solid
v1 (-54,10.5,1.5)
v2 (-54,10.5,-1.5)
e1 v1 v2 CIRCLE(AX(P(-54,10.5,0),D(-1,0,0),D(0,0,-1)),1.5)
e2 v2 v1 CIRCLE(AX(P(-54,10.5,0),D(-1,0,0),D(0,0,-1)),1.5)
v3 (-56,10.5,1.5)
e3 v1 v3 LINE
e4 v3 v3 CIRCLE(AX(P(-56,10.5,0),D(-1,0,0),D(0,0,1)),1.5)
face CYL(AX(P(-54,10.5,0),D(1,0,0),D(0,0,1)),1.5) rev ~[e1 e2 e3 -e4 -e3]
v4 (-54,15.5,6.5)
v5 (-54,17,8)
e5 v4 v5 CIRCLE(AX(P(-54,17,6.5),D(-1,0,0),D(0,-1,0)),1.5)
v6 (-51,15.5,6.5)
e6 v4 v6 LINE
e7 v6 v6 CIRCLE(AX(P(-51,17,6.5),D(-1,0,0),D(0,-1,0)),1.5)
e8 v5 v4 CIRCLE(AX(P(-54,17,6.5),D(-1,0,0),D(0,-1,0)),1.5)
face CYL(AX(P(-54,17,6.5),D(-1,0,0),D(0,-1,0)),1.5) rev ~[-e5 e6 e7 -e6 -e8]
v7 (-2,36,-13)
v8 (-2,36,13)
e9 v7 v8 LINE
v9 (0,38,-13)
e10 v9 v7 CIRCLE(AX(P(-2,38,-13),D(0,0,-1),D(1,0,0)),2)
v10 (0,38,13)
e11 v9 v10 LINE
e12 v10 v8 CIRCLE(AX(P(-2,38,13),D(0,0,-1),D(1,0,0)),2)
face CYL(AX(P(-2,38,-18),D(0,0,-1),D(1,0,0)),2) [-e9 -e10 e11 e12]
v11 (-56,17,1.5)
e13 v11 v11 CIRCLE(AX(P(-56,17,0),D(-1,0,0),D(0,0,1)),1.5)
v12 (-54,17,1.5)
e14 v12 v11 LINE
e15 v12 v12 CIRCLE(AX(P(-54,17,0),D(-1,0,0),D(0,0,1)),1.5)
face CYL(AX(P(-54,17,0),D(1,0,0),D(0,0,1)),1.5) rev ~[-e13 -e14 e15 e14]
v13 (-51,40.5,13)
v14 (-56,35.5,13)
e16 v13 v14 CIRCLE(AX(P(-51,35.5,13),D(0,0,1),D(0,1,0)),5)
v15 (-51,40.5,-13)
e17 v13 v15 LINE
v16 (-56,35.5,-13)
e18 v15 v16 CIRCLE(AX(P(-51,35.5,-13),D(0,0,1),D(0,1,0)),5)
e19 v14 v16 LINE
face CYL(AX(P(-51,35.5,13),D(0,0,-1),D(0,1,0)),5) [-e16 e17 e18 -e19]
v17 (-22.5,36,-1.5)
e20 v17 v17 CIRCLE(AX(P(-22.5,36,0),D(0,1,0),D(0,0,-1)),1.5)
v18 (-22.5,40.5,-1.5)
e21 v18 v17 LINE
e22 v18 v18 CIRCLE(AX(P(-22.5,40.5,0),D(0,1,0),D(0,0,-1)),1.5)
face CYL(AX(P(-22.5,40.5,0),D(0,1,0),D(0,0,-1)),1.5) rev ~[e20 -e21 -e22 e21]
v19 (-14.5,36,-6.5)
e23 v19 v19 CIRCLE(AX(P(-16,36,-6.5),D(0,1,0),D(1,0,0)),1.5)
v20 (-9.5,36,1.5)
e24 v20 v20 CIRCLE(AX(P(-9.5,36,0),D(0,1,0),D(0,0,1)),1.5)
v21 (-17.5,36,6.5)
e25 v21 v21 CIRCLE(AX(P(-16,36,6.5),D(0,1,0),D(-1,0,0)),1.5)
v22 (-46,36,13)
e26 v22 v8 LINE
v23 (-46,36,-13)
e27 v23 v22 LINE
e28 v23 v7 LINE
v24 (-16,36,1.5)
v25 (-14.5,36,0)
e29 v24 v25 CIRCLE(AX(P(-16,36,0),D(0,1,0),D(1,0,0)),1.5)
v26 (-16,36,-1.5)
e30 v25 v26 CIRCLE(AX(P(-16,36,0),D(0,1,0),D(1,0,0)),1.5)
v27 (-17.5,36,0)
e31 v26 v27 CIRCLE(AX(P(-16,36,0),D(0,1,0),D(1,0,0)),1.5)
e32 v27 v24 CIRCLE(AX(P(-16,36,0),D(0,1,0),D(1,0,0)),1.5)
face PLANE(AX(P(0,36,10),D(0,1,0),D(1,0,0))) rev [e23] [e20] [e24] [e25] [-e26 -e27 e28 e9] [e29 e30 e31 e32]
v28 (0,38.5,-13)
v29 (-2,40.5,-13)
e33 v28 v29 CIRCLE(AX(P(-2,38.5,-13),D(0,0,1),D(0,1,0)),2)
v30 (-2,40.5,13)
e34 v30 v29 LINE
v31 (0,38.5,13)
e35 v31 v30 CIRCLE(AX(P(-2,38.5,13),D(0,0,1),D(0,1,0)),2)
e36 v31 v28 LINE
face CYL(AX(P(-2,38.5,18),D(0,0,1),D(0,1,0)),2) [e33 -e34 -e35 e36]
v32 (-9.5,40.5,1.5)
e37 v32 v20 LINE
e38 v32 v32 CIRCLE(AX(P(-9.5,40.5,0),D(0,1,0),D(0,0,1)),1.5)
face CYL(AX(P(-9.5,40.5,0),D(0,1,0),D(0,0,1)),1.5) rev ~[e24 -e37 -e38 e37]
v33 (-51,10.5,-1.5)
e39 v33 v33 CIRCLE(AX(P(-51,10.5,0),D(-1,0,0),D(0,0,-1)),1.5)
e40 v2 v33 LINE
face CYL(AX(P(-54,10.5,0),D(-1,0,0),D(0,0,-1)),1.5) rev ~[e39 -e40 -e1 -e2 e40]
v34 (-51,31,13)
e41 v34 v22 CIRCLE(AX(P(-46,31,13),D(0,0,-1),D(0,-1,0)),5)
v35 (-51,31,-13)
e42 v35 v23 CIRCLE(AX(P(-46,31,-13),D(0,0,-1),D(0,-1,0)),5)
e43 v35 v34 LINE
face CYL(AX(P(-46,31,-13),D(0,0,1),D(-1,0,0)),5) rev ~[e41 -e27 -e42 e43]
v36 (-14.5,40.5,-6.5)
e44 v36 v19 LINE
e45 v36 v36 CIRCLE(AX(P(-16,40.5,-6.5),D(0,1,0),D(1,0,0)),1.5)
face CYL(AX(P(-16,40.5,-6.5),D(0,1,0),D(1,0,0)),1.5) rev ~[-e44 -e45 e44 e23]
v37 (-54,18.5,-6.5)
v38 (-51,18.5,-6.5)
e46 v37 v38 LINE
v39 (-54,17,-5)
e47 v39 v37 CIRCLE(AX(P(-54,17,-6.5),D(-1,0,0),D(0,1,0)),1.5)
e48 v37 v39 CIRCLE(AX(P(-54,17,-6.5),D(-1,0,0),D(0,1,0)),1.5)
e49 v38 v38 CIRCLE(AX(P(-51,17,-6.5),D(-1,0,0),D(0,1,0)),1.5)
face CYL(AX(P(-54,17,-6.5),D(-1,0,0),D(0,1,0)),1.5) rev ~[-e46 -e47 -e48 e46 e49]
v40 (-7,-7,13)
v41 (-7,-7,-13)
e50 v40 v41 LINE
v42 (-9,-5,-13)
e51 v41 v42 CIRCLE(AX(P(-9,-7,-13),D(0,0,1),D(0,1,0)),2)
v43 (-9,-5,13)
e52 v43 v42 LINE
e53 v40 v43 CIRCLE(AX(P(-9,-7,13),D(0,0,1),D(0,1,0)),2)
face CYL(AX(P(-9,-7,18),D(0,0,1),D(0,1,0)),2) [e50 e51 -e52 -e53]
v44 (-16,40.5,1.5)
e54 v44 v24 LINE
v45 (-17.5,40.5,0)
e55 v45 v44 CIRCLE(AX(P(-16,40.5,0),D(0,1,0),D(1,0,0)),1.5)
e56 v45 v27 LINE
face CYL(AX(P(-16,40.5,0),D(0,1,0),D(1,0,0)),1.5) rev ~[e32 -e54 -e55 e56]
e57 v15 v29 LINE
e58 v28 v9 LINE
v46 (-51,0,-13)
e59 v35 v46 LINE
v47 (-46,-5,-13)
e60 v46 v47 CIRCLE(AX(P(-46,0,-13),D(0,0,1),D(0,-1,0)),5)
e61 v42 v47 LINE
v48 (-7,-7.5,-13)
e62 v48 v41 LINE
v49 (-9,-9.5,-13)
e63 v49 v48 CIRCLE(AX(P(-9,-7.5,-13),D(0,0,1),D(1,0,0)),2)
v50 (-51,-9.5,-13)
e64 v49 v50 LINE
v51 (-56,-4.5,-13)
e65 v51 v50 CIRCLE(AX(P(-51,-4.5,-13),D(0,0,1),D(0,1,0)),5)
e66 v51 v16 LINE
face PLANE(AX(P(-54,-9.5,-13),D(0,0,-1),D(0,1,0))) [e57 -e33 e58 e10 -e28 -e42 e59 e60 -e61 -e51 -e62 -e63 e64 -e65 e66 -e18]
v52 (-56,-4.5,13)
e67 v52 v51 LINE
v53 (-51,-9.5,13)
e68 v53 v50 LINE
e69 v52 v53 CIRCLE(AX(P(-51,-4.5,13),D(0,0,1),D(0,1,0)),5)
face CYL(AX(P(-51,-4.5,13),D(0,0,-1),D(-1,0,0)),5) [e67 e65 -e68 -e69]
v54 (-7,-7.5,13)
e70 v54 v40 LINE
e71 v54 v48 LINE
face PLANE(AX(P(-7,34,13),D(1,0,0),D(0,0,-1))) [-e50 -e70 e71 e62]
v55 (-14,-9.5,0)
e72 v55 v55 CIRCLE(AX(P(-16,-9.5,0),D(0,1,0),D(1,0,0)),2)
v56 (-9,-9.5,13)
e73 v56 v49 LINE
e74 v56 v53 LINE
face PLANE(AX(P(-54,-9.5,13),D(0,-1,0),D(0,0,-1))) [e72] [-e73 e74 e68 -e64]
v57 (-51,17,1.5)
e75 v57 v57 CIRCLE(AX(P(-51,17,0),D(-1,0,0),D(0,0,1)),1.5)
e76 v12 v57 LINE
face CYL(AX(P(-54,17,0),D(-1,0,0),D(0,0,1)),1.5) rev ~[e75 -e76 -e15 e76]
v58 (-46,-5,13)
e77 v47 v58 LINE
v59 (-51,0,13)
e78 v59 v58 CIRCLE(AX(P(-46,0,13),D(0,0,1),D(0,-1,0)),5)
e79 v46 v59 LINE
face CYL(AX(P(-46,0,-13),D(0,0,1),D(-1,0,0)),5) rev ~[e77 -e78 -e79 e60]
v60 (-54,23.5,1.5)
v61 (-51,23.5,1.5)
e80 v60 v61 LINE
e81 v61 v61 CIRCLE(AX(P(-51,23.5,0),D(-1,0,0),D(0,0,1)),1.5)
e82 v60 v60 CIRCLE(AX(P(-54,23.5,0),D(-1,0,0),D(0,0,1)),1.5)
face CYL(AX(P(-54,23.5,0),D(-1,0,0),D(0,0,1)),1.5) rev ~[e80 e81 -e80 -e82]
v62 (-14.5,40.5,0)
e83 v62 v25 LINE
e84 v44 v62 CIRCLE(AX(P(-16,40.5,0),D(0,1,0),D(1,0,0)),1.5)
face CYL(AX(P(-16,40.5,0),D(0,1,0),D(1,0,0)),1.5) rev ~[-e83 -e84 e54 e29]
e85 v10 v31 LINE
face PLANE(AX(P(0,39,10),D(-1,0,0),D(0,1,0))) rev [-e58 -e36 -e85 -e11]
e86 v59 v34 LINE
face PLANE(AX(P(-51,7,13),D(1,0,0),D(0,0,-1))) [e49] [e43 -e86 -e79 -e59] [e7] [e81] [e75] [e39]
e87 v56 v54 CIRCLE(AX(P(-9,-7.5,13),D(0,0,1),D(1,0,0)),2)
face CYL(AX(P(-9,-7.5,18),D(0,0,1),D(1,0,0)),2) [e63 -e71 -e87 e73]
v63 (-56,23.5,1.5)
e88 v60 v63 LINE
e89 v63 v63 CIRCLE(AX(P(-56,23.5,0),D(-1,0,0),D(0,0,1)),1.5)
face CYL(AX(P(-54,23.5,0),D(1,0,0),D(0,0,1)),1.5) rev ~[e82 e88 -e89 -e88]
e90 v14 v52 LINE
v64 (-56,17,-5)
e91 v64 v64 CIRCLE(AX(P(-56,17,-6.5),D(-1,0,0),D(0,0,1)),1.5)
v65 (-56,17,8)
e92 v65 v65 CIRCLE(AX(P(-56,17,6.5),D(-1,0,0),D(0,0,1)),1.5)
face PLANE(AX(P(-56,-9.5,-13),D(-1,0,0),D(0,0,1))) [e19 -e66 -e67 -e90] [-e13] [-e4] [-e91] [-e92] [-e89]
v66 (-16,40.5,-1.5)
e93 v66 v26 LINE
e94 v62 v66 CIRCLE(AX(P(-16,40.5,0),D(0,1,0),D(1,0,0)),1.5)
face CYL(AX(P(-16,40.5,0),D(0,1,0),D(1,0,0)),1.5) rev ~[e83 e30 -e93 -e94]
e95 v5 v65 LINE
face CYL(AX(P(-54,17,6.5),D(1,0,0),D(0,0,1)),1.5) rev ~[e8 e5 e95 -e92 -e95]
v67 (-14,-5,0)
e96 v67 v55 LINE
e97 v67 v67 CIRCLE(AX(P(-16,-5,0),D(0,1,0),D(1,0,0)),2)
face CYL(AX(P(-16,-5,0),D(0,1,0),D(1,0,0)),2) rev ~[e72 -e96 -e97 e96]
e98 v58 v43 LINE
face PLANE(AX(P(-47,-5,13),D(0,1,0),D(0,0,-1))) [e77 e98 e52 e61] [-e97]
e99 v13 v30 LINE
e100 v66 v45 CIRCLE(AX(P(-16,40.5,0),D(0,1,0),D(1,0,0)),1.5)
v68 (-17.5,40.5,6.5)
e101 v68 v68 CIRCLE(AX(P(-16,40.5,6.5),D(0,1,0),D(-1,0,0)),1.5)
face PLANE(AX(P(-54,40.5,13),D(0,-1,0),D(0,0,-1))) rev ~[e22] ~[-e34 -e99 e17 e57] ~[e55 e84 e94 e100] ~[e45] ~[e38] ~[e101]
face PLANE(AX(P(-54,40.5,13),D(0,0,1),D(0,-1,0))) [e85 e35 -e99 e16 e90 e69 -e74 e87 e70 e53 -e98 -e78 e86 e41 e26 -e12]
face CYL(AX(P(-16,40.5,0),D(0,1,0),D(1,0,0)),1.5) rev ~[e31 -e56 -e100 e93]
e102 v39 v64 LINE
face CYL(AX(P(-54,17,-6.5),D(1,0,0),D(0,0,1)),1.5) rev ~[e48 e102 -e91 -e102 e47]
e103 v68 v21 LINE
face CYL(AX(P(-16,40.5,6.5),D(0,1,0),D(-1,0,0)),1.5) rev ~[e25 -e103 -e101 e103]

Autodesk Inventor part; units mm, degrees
ref_plane "YZ Plane" through (0, 0, 0) normal (1, 0, 0) x (0, 1, 0)
sketch "Sketch1" plane through (0, 0, 0) normal (0, 0, 1) x (1, 0, 0)
  line L0 (0, 0) -> (-51, 0)
  line L1 (-51, 0) -> (-51, 18)
  line L2 (-51, 18) -> (0, 18) construction
  line L3 (-51, 18) -> (-54, 18)
  line L4 (-54, 18) -> (-54, -3)
  line L5 (-54, -3) -> (0, -3)
  line L6 (0, -3) -> (0, 0)
  dimension "d0" = 18
  dimension "d1" = 3
  dimension "d2" = 3
  dimension "d3" = 54
extrude "Extrusion1" add sketch "Sketch1" along normal blind 10
mirror "Mirror1" about plane through (-33.12, 1.38, 0) normal (0, 0, -1) of "Extrusion1"
mirror "Mirror2" about plane through (-51, 18, 0) normal (0, 1, 0) of "Extrusion1", "Mirror1"
sketch "Sketch4" plane through (0, -3, -10) normal (0, 0, -1) x (-1, 0, 0)
  line L0 (0, 3) -> (51, 3) projected
  line L1 (0, 0) -> (0, 3) projected
  line L2 (54, 0) -> (0, 0) projected
  line L3 (54, 42) -> (54, 0) projected
  line L4 (54, 42) -> (0, 42) projected
  line L5 (0, 42) -> (0, 39) projected
  line L6 (0, 39) -> (51, 39) projected
  line L7 (51, 39) -> (51, 3) projected
  line L8 (0, 3) -> (51, 3) projected
  line L9 (0, 0) -> (0, 3) projected
  line L10 (54, 0) -> (0, 0) projected
  line L11 (54, 42) -> (54, 0) projected
  line L12 (54, 42) -> (0, 42) projected
  line L13 (0, 42) -> (0, 39) projected
  line L14 (0, 39) -> (51, 39) projected
  line L15 (51, 39) -> (51, 3) projected
extrude "Extrusion4" add sketch "Sketch4" along normal blind 5
mirror "Mirror3" about plane through (0, 0, 0) normal (0, 0, 1) of "Extrusion4"
sketch "Sketch11" plane through (-54, -3, -15) normal (0, -1, 0) x (1, 0, 0)
  line L0 (54, 0) -> (54, 30) projected
  line L1 (54, 30) -> (0, 30) projected
  line L2 (0, 0) -> (0, 30) projected
  line L3 (54, 0) -> (0, 0) projected
  line L4 (54, 0) -> (54, 30) projected
  line L5 (54, 30) -> (0, 30) projected
  line L6 (0, 0) -> (0, 30) projected
  line L7 (54, 0) -> (0, 0) projected
  point P0 (54, 15)
extrude "Extrusion11" cut sketch "Sketch11" against normal blind 10
sketch "Sketch13" plane through (0, 36, -15) normal (1, 0, 0) x (0, 0, -1)
  line L0 (-30, 3) -> (-28, 3)
  line L1 (-28, 3) -> (-28, -29)
  line L2 (-28, -29) -> (-30, -29)
  line L3 (-30, -29) -> (-30, 3)
  line L4 (-30, -29) -> (0, -29) projected
  point P0 (-15, -36)
  dimension "d65" = 2
extrude "Extrusion13" cut sketch "Sketch13" against normal up to next
mirror "Mirror4" about plane through (0, 0, 0) normal (0, 0, 1) of "Extrusion13"
sketch "Sketch14" plane through (-54, 7, 13) normal (-1, 0, 0) x (0, 0, 1)
  line L0 (-26, 32) -> (-26, 0) projected
  line L1 (-26, 0) -> (0, 0) projected
  line L2 (0, 32) -> (-26, 32) projected
  circle A0 centre (-13, 10) radius 6.5 construction
  line L3 (-13, 10) -> (-26, 10) construction
  line L4 (-13, 10) -> (-13, 32) construction
  circle A1 centre (-13, 10) radius 1.5
  circle A2 centre (-13, 16.5) radius 1.5
  point P0 (-13, -7)
  point P1 (-13, 0)
  dimension "d68" = 13
  dimension "d69" = 22
  dimension "d71" = 3
  dimension "d72" = 3
extrude "Extrusion14" cut sketch "Sketch14" against normal up to next
pattern_circular "Circular Pattern6" count 4 over 360 about axis through (-54, 17, 0) along (1, 0, 0) of "Extrusion14"
sketch "Sketch15" plane through (-51, 36, 13) normal (0, -1, 0) x (1, 0, 0)
  line L0 (51, -26) -> (51, 0) projected
  line L1 (51, 0) -> (0, 0) projected
  circle A0 centre (35, -13) radius 6.5 construction
  line L2 (35, -13) -> (35, 0) construction
  circle A1 centre (35, -6.5) radius 1.5
  circle A2 centre (35, -13) radius 1.5
  point P0 (51, -13)
  point P1 (51, -13)
  dimension "d78" = 13
  dimension "d79" = 16
  dimension "d80" = 3
  dimension "d81" = 3
extrude "Extrusion15" cut sketch "Sketch15" against normal up to next
pattern_circular "Circular Pattern7" count 4 over 360 about axis through (-16, 36, 0) along (0, 1, 0) of "Extrusion15"
sketch "Sketch16" plane through (-54, 7, -15) normal (0, -1, 0) x (1, 0, 0)
  line L0 (0, 2) -> (3, 2) projected
  line L1 (3, 28) -> (3, 2) projected
  line L2 (3, 28) -> (0, 28) projected
  line L3 (0, 2) -> (0, 28) projected
  line L4 (0, 2) -> (3, 2) projected
  line L5 (3, 28) -> (3, 2) projected
  line L6 (3, 28) -> (0, 28) projected
  line L7 (0, 2) -> (0, 28) projected
  point P0 (54, 15)
extrude "Extrusion16" add sketch "Sketch16" along normal blind 14
ref_plane "Work Plane1" through (-47, 34, 13) normal (1, 0, 0) x (0, 0, -1)
sketch "Sketch17" plane through (-47, 34, 13) normal (1, 0, 0) x (0, 0, -1)
  line L0 (0, 0) -> (0, -41) projected
  line L1 (26, -41) -> (0, -41)
  line L2 (0, -41) -> (0, -39)
  line L3 (0, -39) -> (26, -39)
  line L4 (26, -39) -> (26, -41)
  point P0 (13, -34)
  dimension "d92" = 2
extrude "Extrusion17" add sketch "Sketch17" along normal blind 40
ref_plane "Work Plane3" through (-47, -5, 13) normal (0, 1, 0) x (1, 0, 0)
sketch "Sketch18" plane through (-47, -5, 13) normal (0, 1, 0) x (1, 0, 0)
  circle A0 centre (31, 13) radius 1.5 projected
  circle A1 centre (31, 13) radius 2
  point P0 (47, 13)
  dimension "d95" = 4
extrude "Extrusion18" cut sketch "Sketch18" against normal up to next contours A0 | A1
sketch "Sketch23" plane through (0, 36, 13) normal (0, 0, 1) x (1, 0, 0)
  line L0 (0, 0) -> (-51, 0) projected
  line L1 (-54, 3) -> (0, 3) projected
  line L2 (-54, -43) -> (-54, 3) projected
  line L3 (-7, -43) -> (-54, -43) projected
  line L4 (-47, -41) -> (-7, -41) projected
  line L5 (-51, 0) -> (-51, -43) projected
  line L6 (0, 0) -> (-51, 0) projected
  line L7 (0, 3) -> (0, 0) projected
  line L8 (-54, 3) -> (0, 3) projected
  line L9 (-54, -43) -> (-54, 3) projected
  line L10 (-51, -43) -> (-54, -43) projected
  line L11 (0, 0) -> (-54, 0)
  line L12 (-54, 0) -> (-54, 4.5)
  line L13 (-54, 4.5) -> (0, 4.5)
  line L14 (0, 4.5) -> (0, 0)
  line L15 (-7, -41) -> (-54, -41)
  line L16 (-54, -41) -> (-54, -45.5)
  line L17 (-54, -45.5) -> (-7, -45.5)
  line L18 (-7, -45.5) -> (-7, -41)
  point P0 (0, -36)
  dimension "d110" = 3
  dimension "d111" = 2
  dimension "d112" = 1.5
  dimension "d113" = 2.5
sketch "Sketch24" plane through (-54, 39, 13) normal (0, 1, 0) x (1, 0, 0)
  circle A0 centre (38, 19.5) radius 1.5 projected
  circle A1 centre (44.5, 13) radius 1.5 projected
  circle A2 centre (31.5, 13) radius 1.5 projected
  circle A3 centre (38, 6.5) radius 1.5 projected
  circle A4 centre (38, 13) radius 1.5 projected
  line L0 (54, 26) -> (0, 26) projected
  line L1 (0, 0) -> (0, 26) projected
  line L2 (0, 0) -> (54, 0) projected
  line L3 (54, 0) -> (54, 26) projected
  point P0 (54, 13)
  dimension "d114" = 26
extrude "Extrusion22" add sketch "Sketch23" against normal up to surface (26 mm away) contours L0 L11 L2 L1 L7 | L1 L12 L13 L14 | L15 L4 L18 L3 L5 | L5 L3 L2 L15 | L3 L18 L17 L16
sketch "Sketch25" plane through (-51, 36, 13) normal (0, 0, 1) x (1, 0, 0)
  line L0 (-3, 4.5) -> (-3, -45.5) projected
  line L1 (-3, -45.5) -> (44, -45.5) projected
  line L2 (44, -41) -> (44, -45.5) projected
  line L3 (44, -41) -> (0, -41) projected
  line L4 (0, 0) -> (0, -41) projected
  line L5 (51, 0) -> (0, 0) projected
  line L6 (51, 4.5) -> (51, 0) projected
  line L7 (51, 4.5) -> (-3, 4.5) projected
  point P0 (51, -36)
  dimension "d117" = 3
sketch "Sketch26" plane through (-54, -9.5, -13) normal (-1, 0, 0) x (0, 0, 1)
  line L0 (0, 0) -> (0, 50) projected
  line L1 (26, 0) -> (0, 0) projected
  line L2 (26, 50) -> (26, 0) projected
  line L3 (26, 50) -> (0, 50) projected
  circle A0 centre (13, 20) radius 1.5 projected
  circle A1 centre (19.5, 26.5) radius 1.5 projected
  circle A2 centre (6.5, 26.5) radius 1.5 projected
  circle A3 centre (13, 26.5) radius 1.5 projected
  circle A4 centre (13, 33) radius 1.5 projected
  line L4 (0, 0) -> (0, 50) projected
  line L5 (26, 0) -> (0, 0) projected
  line L6 (26, 50) -> (26, 0) projected
  circle A5 centre (13, 20) radius 1.5 projected
  circle A6 centre (19.5, 26.5) radius 1.5 projected
  circle A7 centre (6.5, 26.5) radius 1.5 projected
  circle A8 centre (13, 26.5) radius 1.5 projected
  circle A9 centre (13, 33) radius 1.5 projected
  line L7 (26, 50) -> (0, 50) projected
  point P0 (13, 9.5)
extrude "Extrusion23" add sketch "Sketch26" along normal blind 2
sketch "Sketch27" plane through (0, 40.5, 13) normal (0, 1, 0) x (1, 0, 0)
  line L0 (-56, 26) -> (0, 26) projected
  line L1 (0, 0) -> (0, 26) projected
  circle A0 centre (-16, 13) radius 6.5 construction
  circle A1 centre (-16, 19.5) radius 1.5
  circle A2 centre (-16, 13) radius 1.5
  line L2 (-16, 13) -> (0, 13) construction
  line L3 (-16, 13) -> (-16, 26) construction
  dimension "d121" = 13
  dimension "d120" = 3
  dimension "d122" = 3
  dimension "d123" = 16
extrude "Extrusion24" cut sketch "Sketch27" against normal up to surface (4.5 mm away)
pattern_circular "Circular Pattern8" count 4 over 360 about axis through (-16, 40.5, 0) along (0, -1, 0) of "Extrusion24"
sketch "Sketch28" plane through (-51, -5, 13) normal (0, 1, 0) x (1, 0, 0)
  circle A0 centre (35, 13) radius 1.5 projected
  circle A1 centre (35, 13) radius 2
  point P0 (51, 13)
  dimension "d129" = 4
extrude "Extrusion25" cut sketch "Sketch28" against normal up to next contours A0 | A1
fillet "Fillet9" radius 2 4 edges at (-7, -5, 0) (-7, -9.5, 0) (0, 40.5, 0) (0, 36, 0)
fillet "Fillet10" radius 5 2 edges at (-51, -5, 0) (-51, 36, 0)
fillet "Fillet11" radius 5 2 edges at (-56, -9.5, 0) (-56, 40.5, 0)
sketch "Sketch29" plane through (-2, 40.5, 13) normal (0, 1, 0) x (1, 0, 0)
  circle A0 centre (-14, 6.5) radius 1.5 projected
  circle A1 centre (-7.5, 13) radius 1.5 projected
  circle A2 centre (-20.5, 13) radius 1.5 projected
  circle A3 centre (-14, 19.5) radius 1.5 projected
  circle A4 centre (-14, 13) radius 1.5 projected
  line L0 (-49, 0) -> (-49, 26) projected
  line L1 (0, 0) -> (-49, 0) projected
  line L2 (0, 26) -> (0, 0) projected
  line L3 (-49, 26) -> (0, 26) projected
  line L4 (-62.85, -6.77) -> (-67.62, -6.77) projected
  line L5 (-117.21, -13.16) -> (-119.57, -13.16) projected
  point P0 (2, 13)
  point P1 (-65.235, -6.77)
  point P2 (-118.39, -13.16)
  dimension "d135" = 51.235
  dimension "d136" = 104.39
  dimension "d137" = 53.155
sketch "Sketch30" plane through (-46, 36, 13) normal (0, 0, 1) x (1, 0, 0)
  arc A0 (-5, 4.5) -> (-10, -0.5) centre (-5, -0.5) ccw projected
  line L0 (-10, -40.5) -> (-10, -0.5) projected
  arc A1 (-10, -40.5) -> (-5, -45.5) centre (-5, -40.5) ccw projected
  line L1 (-5, -45.5) -> (37, -45.5) projected
  arc A2 (37, -45.5) -> (39, -43.5) centre (37, -43.5) ccw projected
  line L2 (39, -43) -> (39, -43.5) projected
  arc A3 (39, -43) -> (37, -41) centre (37, -43) ccw projected
  line L3 (37, -41) -> (0, -41) projected
  arc A4 (-5, -36) -> (0, -41) centre (0, -36) ccw projected
  line L4 (-5, -5) -> (-5, -36) projected
  arc A5 (0, 0) -> (-5, -5) centre (0, -5) ccw projected
  line L5 (44, 0) -> (0, 0) projected
  arc A6 (44, 0) -> (46, 2) centre (44, 2) ccw projected
  line L6 (46, 2.5) -> (46, 2) projected
  arc A7 (46, 2.5) -> (44, 4.5) centre (44, 2.5) ccw projected
  line L7 (44, 4.5) -> (-5, 4.5) projected
  circle A8 centre (-21.235, -24.295) radius 1.5 projected
  circle A9 centre (-74.39, -26.06) radius 1.5 projected
  line L8 (28.82, -7.86) -> (31.18, -7.86) projected
  point P0 (46, -36)
  point P1 (30, -7.86)
  dimension "d138" = 51.235
  dimension "d139" = 104.39
  dimension "d140" = 53.155
sketch "Sketch31" plane through (-2, 40.5, 13) normal (0, 1, 0) x (1, 0, 0)
  circle A0 centre (-14, 6.5) radius 1.5 projected
  circle A1 centre (-7.5, 13) radius 1.5 projected
  circle A2 centre (-20.5, 13) radius 1.5 projected
  circle A3 centre (-14, 19.5) radius 1.5 projected
  circle A4 centre (-14, 13) radius 1.5 projected
  line L0 (-49, 0) -> (-49, 26) projected
  line L1 (0, 0) -> (-49, 0) projected
  line L2 (0, 26) -> (0, 0) projected
  line L3 (-49, 26) -> (0, 26) projected
  line L4 (-233.9534, -25.52) -> (-233.9534, -21.02)
  point P0 (2, 13)
  point P1 (-118.39, -13.16)
  point P2 (-118.39, -13.16)
  dimension "d141" = 115.5634
sketch "Sketch32" plane through (-46, 36, 13) normal (0, 0, 1) x (1, 0, 0)
  arc A0 (-5, 4.5) -> (-10, -0.5) centre (-5, -0.5) ccw projected
  line L0 (-10, -40.5) -> (-10, -0.5) projected
  arc A1 (-10, -40.5) -> (-5, -45.5) centre (-5, -40.5) ccw projected
  line L1 (-5, -45.5) -> (37, -45.5) projected
  arc A2 (37, -45.5) -> (39, -43.5) centre (37, -43.5) ccw projected
  line L2 (39, -43) -> (39, -43.5) projected
  arc A3 (39, -43) -> (37, -41) centre (37, -43) ccw projected
  line L3 (37, -41) -> (0, -41) projected
  arc A4 (-5, -36) -> (0, -41) centre (0, -36) ccw projected
  line L4 (-5, -5) -> (-5, -36) projected
  arc A5 (0, 0) -> (-5, -5) centre (0, -5) ccw projected
  line L5 (44, 0) -> (0, 0) projected
  arc A6 (44, 0) -> (46, 2) centre (44, 2) ccw projected
  line L6 (46, 2.5) -> (46, 2) projected
  arc A7 (46, 2.5) -> (44, 4.5) centre (44, 2.5) ccw projected
  line L7 (44, 4.5) -> (-5, 4.5) projected
  arc A8 (-187.9273, -23.2225) -> (-187.9273, -28.8975) centre (-186.9534, -26.06) ccw projected
  circle A9 centre (-74.39, -26.06) radius 1.18 projected
  point P0 (46, -36)
  point P1 (-189.9534, -26.06)
  dimension "d142" = 115.563
equation "\"d72\" = d71"
properties part number "C_MARK3"
